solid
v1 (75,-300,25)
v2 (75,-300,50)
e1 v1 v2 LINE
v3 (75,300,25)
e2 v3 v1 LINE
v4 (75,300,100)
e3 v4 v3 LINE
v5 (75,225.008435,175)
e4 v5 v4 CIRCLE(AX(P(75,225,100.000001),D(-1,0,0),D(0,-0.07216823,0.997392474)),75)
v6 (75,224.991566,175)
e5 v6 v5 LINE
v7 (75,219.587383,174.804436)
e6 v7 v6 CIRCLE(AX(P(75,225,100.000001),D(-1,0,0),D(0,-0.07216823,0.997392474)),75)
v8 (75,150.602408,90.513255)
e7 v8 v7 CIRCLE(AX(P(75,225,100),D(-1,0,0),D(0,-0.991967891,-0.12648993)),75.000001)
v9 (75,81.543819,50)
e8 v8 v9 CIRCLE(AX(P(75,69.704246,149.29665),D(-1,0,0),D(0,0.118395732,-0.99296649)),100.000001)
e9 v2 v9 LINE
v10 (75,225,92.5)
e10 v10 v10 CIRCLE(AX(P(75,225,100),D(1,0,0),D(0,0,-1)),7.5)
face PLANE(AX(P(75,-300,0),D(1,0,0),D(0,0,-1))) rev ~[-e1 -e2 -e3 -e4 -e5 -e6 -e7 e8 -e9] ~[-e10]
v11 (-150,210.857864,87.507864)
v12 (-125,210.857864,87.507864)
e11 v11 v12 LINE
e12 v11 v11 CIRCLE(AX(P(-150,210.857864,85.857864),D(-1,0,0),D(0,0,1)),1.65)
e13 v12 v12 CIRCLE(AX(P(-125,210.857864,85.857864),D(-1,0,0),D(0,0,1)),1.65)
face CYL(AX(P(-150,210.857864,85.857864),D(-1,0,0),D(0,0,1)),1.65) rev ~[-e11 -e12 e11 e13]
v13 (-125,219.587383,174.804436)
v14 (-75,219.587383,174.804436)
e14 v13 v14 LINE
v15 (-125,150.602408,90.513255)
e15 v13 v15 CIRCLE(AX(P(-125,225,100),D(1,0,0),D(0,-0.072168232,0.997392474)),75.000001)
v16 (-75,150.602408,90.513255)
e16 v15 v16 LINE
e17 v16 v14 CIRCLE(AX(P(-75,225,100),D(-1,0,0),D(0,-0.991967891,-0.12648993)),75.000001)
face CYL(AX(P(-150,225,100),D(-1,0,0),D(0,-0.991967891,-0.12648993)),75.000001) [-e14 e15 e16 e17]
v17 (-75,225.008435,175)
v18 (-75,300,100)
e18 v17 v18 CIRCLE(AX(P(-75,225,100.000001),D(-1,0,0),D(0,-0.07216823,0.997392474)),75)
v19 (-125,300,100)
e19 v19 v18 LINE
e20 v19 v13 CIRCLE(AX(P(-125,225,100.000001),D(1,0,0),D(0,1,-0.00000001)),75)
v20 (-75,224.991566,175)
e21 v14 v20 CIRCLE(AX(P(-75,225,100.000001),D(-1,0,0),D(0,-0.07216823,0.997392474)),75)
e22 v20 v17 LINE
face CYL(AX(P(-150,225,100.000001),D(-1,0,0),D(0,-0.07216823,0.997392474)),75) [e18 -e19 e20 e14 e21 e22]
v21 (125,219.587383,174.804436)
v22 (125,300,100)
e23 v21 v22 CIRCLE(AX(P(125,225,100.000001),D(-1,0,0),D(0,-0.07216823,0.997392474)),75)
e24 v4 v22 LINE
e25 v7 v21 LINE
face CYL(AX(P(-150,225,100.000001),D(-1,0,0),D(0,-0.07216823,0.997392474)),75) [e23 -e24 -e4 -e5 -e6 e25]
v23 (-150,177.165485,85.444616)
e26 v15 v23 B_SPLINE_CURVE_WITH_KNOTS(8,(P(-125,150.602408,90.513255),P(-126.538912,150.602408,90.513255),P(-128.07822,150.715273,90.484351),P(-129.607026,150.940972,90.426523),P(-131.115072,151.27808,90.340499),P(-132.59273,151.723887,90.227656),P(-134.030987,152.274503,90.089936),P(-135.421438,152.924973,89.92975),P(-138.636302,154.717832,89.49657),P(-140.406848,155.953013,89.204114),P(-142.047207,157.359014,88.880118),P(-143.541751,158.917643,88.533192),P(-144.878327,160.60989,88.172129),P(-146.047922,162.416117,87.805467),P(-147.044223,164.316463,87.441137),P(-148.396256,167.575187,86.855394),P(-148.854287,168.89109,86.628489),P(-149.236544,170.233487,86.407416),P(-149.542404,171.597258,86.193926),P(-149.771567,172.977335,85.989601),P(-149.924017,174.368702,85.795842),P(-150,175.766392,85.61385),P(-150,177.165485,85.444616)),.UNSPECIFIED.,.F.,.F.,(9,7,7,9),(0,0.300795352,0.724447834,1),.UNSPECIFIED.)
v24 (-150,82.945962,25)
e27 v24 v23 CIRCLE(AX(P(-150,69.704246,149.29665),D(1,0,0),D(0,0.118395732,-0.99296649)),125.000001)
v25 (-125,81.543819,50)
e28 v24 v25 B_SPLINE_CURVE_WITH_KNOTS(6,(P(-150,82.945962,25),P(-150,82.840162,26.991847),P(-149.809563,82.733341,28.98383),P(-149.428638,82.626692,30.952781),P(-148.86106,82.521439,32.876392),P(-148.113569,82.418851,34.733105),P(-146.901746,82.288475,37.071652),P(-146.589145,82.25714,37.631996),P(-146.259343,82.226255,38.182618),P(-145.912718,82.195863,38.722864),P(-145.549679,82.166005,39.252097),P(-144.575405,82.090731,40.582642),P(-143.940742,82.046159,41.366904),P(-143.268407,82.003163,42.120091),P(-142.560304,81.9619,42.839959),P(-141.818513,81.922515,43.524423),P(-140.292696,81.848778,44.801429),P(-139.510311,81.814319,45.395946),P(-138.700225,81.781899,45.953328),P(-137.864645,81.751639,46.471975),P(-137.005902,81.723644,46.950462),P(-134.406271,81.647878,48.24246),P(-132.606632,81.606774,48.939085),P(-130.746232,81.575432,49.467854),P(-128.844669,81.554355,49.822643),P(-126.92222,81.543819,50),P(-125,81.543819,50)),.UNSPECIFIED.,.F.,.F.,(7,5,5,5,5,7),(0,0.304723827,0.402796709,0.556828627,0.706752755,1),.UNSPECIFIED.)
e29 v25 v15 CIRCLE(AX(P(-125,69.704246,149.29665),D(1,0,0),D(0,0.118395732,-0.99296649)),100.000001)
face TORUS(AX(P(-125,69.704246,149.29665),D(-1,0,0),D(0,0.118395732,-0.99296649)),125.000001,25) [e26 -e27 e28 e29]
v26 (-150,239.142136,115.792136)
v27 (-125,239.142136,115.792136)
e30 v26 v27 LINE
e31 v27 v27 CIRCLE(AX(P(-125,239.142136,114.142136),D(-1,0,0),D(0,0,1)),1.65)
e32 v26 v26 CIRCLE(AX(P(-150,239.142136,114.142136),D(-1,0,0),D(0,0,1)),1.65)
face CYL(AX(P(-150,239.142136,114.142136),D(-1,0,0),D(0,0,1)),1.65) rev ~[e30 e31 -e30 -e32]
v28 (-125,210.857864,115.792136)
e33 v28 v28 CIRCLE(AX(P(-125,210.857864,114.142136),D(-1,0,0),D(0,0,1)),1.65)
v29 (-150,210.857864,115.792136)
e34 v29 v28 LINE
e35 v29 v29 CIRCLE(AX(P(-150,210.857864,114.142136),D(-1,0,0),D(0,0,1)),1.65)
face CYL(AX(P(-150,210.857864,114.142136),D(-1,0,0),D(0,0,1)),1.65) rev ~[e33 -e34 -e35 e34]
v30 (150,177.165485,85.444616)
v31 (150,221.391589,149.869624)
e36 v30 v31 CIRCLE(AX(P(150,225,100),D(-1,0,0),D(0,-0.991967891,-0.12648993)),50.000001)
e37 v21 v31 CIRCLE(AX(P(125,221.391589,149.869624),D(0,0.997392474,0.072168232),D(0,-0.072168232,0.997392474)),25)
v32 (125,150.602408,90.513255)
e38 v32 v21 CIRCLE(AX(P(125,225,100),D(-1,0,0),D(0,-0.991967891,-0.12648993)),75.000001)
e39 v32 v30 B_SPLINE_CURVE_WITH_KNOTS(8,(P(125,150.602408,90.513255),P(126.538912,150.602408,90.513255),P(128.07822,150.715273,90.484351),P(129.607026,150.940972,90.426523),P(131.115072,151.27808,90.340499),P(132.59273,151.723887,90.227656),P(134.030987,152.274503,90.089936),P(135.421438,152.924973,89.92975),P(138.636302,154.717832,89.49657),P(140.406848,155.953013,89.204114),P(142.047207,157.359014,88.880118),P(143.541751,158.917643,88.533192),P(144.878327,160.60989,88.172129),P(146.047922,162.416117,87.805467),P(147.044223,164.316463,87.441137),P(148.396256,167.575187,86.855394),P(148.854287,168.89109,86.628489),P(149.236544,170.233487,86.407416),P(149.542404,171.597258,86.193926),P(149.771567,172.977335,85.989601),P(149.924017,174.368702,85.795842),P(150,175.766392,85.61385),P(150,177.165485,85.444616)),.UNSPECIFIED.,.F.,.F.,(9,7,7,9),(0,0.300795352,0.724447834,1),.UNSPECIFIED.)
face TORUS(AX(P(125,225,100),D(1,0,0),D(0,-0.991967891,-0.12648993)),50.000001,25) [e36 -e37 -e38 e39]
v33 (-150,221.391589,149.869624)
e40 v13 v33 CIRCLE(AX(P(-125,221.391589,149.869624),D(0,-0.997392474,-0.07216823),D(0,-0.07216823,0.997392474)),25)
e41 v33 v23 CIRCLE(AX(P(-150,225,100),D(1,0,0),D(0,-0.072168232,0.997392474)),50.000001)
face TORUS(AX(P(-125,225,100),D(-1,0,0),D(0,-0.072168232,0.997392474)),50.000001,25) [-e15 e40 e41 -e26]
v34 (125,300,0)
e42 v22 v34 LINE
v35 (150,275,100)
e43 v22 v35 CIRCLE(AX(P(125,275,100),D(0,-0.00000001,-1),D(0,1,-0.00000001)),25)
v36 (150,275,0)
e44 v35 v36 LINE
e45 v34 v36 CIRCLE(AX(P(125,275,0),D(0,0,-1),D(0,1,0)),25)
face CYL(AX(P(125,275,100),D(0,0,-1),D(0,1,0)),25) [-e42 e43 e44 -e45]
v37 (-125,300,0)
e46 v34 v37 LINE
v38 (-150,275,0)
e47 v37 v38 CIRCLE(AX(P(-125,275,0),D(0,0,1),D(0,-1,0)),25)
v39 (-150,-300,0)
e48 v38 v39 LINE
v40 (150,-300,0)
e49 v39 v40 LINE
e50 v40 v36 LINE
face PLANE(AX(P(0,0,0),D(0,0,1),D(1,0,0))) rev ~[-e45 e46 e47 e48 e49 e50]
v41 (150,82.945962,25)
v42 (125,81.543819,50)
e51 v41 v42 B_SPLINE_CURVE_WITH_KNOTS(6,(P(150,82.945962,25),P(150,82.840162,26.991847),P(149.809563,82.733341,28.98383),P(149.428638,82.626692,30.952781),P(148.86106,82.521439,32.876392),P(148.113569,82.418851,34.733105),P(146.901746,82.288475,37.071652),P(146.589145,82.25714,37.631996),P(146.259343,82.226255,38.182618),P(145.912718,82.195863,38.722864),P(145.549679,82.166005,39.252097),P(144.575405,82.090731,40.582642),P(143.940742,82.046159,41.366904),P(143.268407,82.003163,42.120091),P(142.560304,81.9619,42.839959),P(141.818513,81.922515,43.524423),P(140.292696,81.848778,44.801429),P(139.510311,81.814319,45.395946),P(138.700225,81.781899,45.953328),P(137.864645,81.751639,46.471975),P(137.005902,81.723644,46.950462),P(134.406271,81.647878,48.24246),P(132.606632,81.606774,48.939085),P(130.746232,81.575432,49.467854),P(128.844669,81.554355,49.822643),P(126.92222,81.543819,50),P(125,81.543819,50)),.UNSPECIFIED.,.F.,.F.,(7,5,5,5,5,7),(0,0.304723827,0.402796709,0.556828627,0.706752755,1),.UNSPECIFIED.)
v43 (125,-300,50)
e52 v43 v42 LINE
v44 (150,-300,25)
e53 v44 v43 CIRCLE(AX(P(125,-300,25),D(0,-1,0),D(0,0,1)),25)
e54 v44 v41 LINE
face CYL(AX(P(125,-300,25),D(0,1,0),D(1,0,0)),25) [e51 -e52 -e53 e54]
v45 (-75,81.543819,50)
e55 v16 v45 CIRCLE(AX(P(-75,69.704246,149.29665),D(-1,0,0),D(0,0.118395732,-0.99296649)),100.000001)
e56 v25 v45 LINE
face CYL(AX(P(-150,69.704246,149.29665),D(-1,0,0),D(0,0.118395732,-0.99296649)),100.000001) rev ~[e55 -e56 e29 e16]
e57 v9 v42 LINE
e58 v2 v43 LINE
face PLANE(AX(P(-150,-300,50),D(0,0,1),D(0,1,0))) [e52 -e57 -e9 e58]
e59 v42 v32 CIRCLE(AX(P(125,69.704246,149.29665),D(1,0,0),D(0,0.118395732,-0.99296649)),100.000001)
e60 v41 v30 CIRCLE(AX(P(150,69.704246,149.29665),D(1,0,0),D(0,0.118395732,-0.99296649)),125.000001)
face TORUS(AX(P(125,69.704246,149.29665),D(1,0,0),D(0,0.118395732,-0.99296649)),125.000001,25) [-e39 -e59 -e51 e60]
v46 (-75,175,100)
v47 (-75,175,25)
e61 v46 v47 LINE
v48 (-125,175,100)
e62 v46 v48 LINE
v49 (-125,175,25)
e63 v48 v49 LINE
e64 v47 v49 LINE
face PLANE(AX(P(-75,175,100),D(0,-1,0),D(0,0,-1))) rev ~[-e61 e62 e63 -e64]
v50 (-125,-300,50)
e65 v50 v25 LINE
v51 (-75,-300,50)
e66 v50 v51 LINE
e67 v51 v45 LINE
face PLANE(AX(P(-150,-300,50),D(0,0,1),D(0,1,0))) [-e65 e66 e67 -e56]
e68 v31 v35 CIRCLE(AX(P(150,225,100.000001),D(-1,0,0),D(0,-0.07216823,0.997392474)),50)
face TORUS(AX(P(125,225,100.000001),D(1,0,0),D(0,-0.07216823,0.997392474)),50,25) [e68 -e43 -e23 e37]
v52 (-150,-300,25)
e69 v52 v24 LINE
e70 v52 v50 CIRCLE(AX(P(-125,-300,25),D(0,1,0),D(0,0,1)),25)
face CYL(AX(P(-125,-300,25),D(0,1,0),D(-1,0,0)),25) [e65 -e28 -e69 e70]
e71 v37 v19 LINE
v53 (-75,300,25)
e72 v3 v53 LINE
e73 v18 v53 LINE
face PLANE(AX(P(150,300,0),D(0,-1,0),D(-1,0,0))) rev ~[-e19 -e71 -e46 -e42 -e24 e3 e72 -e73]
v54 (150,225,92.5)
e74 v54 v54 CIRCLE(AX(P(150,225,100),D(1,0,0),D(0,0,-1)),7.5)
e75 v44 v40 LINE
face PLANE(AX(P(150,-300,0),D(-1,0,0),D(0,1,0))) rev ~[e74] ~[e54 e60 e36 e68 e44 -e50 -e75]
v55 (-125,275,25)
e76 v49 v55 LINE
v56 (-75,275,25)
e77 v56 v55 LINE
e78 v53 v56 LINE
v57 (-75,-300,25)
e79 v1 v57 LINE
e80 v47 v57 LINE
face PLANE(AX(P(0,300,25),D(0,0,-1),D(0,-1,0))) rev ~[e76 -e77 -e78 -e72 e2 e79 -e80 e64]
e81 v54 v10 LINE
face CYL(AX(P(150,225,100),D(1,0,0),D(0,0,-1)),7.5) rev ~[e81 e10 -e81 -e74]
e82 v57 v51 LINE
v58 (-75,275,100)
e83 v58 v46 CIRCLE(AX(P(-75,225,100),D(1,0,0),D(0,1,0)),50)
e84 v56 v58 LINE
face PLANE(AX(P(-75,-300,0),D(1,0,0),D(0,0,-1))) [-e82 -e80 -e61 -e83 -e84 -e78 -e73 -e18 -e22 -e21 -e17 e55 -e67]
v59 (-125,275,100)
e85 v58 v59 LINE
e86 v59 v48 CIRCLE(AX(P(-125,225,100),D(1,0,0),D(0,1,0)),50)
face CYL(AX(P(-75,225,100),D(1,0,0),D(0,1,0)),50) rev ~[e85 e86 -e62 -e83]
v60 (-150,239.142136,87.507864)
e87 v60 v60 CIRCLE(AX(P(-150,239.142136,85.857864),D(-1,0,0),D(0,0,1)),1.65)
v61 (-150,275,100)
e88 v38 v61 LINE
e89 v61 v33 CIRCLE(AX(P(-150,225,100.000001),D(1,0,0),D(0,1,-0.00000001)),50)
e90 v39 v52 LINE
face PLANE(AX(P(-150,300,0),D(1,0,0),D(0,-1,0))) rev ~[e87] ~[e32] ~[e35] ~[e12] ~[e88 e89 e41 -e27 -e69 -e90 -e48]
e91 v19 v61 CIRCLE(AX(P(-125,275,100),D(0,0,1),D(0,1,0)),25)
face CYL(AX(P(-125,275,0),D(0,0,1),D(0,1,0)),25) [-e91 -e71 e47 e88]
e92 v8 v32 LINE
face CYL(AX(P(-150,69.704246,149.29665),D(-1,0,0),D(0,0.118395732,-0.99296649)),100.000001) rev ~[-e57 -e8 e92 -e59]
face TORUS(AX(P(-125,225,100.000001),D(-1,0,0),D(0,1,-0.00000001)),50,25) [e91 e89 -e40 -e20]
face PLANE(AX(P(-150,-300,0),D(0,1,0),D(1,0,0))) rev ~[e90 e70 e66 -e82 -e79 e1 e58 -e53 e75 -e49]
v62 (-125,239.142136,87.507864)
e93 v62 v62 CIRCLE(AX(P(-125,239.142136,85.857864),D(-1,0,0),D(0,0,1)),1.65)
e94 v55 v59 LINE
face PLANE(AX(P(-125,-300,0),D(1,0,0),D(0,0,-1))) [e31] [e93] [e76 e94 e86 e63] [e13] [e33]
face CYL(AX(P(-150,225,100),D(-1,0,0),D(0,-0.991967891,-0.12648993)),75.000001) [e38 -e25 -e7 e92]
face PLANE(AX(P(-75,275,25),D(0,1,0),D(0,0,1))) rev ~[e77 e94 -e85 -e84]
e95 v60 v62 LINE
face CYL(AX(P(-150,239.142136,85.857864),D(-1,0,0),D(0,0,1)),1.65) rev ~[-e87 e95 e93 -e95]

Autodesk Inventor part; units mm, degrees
ref_plane "YZ Plane" through (0, 0, 0) normal (1, 0, 0) x (0, 1, 0)
ref_plane "XZ Plane" through (0, 0, 0) normal (0, 1, 0) x (-1, 0, 0)
sketch "Sketch1" plane through (0, 0, 0) normal (0, 0, 1) x (1, 0, 0)
  line L0 (-150, -300) -> (150, -300)
  line L1 (150, -300) -> (150, 300)
  line L2 (150, 300) -> (-150, 300)
  line L3 (-150, 300) -> (-150, -300)
  line L4 (-150, -300) -> (150, 300) construction
  line L5 (150, -300) -> (-150, 300) construction
  point P0 (0, 0)
  point P1 (0, 0)
  dimension "d23" = 300
  dimension "d24" = 600
sketch "Sketch1 outline for Extrusion1" plane through (0, 0, 0) normal (0, 0, 1) x (1, 0, 0)
  line L0 (-150, 300) -> (-150, -300)
  line L1 (150, 300) -> (-150, 300)
  line L2 (150, -300) -> (150, 300)
  line L3 (-150, -300) -> (150, -300)
extrude "Extrusion1" add sketch "Sketch1 outline for Extrusion1" along normal blind 25
sketch "Sketch15" plane through (-150, -300, 0) normal (-1, 0, 0) x (0, 0, 1)
  line L0 (0, 0) -> (0, 600) construction
  line L1 (0, 600) -> (300, 600) construction
  line L2 (0, 600) -> (300, 600) construction
  line L3 (25, 600) -> (25, 0) construction
  line L4 (0, 600) -> (25, 600)
  line L5 (25, 600) -> (100, 600)
  line L6 (25, 381.543819) -> (50, 381.543819) construction
  line L7 (25, 0) -> (50, 0)
  line L8 (50, 0) -> (50, 381.543819)
  arc A0 (174.804436, 519.587383) -> (100, 600) centre (100, 525) ccw
  arc A1 (90.513255, 450.602408) -> (174.804436, 519.587383) centre (100, 525) ccw
  arc A2 (90.513255, 450.602408) -> (50, 381.543819) centre (149.296649, 369.704246) ccw
  line L9 (25, 0) -> (25, 600)
  line L10 (25, 0) -> (25, 600)
  point P0 (0, 300)
  dimension "d54" = 300
  dimension "d55" = 0
  dimension "d59" = 25
  dimension "d60" = 25
  dimension "d61" = 75
  dimension "d62" = 75
  dimension "d63" = 75
  dimension "d65" = 100
  dimension "d79" = 124.29665
sketch "Sketch15 outline for Extrusion14" plane through (-150, -300, 0) normal (-1, 0, 0) x (0, 0, 1)
  line L0 (100, 600) -> (25, 600)
  arc A0 (174.804436, 519.587383) -> (100, 600) centre (100, 525) ccw
  arc A1 (90.513255, 450.602408) -> (174.804436, 519.587383) centre (100, 525) ccw
  arc A2 (50, 381.543819) -> (90.513255, 450.602408) centre (149.296649, 369.704246) cw
  line L1 (50, 0) -> (50, 381.543819)
  line L2 (25, 0) -> (50, 0)
  line L3 (25, 600) -> (25, 0)
extrude "Extrusion14" add sketch "Sketch15 outline for Extrusion14" against normal blind 300
ref_plane "Work Plane1" through (0, -300, 0) normal (1, 0, 0) x (0, 0, -1)
sketch "Sketch16" plane through (0, -300, 0) normal (1, 0, 0) x (0, 0, -1)
  line L0 (-175, 600) -> (-25, 600)
  line L1 (-25, 600) -> (-25, 0)
  line L2 (-25, 0) -> (-175, 0)
  line L3 (-175, 0) -> (-175, 600)
  point P0 (0, 300)
  dimension "d73" = 150
  dimension "d74" = 600
  dimension "d75" = 25
  dimension "d76" = 300
sketch "Sketch16 outline for Extrusion16" plane through (0, -300, 0) normal (1, 0, 0) x (0, 0, -1)
  line L0 (-175, 600) -> (-25, 600)
  line L1 (-25, 600) -> (-25, 0)
  line L2 (-25, 0) -> (-175, 0)
  line L3 (-175, 0) -> (-175, 600)
extrude "Extrusion16" cut sketch "Sketch16 outline for Extrusion16" along normal mid plane 150
sketch "Sketch17" plane through (-75, -300, 0) normal (1, 0, 0) x (0, 0, -1)
  arc A0 (-100, 600) -> (-90.513255, 450.602408) centre (-100, 525) ccw
  line L0 (-100, 475) -> (-25, 475)
  line L1 (-25, 475) -> (-25, 575)
  line L2 (-25, 575) -> (-100, 575)
  arc A1 (-100, 575) -> (-100, 475) centre (-100, 525) ccw
  line L3 (0, 600) -> (0, 0)
  point P0 (0, 300)
  dimension "d86" = 50
  dimension "d87" = 25
  dimension "d88" = 90
sketch "Sketch17 outline for Extrusion17" plane through (-75, -300, 0) normal (1, 0, 0) x (0, 0, -1)
  arc A0 (-100, 575) -> (-100, 475) centre (-100, 525) ccw
  line L0 (-25, 575) -> (-100, 575)
  line L1 (-25, 475) -> (-25, 575)
  line L2 (-100, 475) -> (-25, 475)
extrude "Extrusion17" cut sketch "Sketch17 outline for Extrusion17" against normal blind 50
sketch "Sketch21" plane through (-150, -300, 0) normal (-1, 0, 0) x (0, 0, 1)
  arc A0 (90.513255, 450.602408) -> (100, 600) centre (100, 525) ccw
  line L0 (85.857864, 510.857864) -> (114.142136, 510.857864) construction
  line L1 (114.142136, 510.857864) -> (114.142136, 539.142136) construction
  line L2 (114.142136, 539.142136) -> (85.857864, 539.142136) construction
  line L3 (85.857864, 539.142136) -> (85.857864, 510.857864) construction
  line L4 (114.142136, 510.857864) -> (85.857864, 539.142136) construction
  circle A1 centre (114.142136, 539.142136) radius 1.65
  circle A2 centre (85.857864, 539.142136) radius 1.65
  circle A3 centre (114.142136, 510.857864) radius 1.65
  circle A4 centre (85.857864, 510.857864) radius 1.65
  line L5 (85.857864, 510.857864) -> (114.142136, 539.142136) construction
  line L6 (0, 600) -> (0, 0) construction
  line L7 (0, 600) -> (100, 600)
  point P0 (0, 300)
  dimension "d102" = 28.28427
  dimension "d103" = 28.28427
  dimension "d104" = 3.3
  dimension "d105" = 3.3
  dimension "d106" = 3.3
  dimension "d107" = 3.3
  dimension "d111" = 85.85786
  dimension "d112" = 60.85786
sketch "Sketch21 outline for Extrusion21" plane through (-150, -300, 0) normal (-1, 0, 0) x (0, 0, 1)
  circle A0 centre (114.142136, 539.142136) radius 1.65
  circle A1 centre (85.857864, 539.142136) radius 1.65
  circle A2 centre (114.142136, 510.857864) radius 1.65
  circle A3 centre (85.857864, 510.857864) radius 1.65
extrude "Extrusion21" cut sketch "Sketch21 outline for Extrusion21" against normal blind 75
sketch "Sketch22" plane through (150, -300, 0) normal (1, 0, 0) x (0, 0, -1)
  circle A0 centre (-100, 525) radius 7.5
  arc A1 (-100, 600) -> (-90.513255, 450.602408) centre (-100, 525) ccw
  point P0 (0, 300)
  dimension "d113" = 15
sketch "Sketch22 outline for Extrusion22" plane through (150, -300, 0) normal (1, 0, 0) x (0, 0, -1)
  circle A0 centre (-100, 525) radius 7.5
extrude "Extrusion22" cut sketch "Sketch22 outline for Extrusion22" against normal blind 75
fillet "Fillet3" radius 25 8 edges at (-150, 300, 50) (-150, 220.2471, 174.8492) (-150, 120.3047, 63.0435) (-150, -109.2281, 50) (150, 300, 50) (150, 220.2471, 174.8492) (150, 120.3047, 63.0435) (150, -109.2281, 50)
properties material "ABS Plastic"
